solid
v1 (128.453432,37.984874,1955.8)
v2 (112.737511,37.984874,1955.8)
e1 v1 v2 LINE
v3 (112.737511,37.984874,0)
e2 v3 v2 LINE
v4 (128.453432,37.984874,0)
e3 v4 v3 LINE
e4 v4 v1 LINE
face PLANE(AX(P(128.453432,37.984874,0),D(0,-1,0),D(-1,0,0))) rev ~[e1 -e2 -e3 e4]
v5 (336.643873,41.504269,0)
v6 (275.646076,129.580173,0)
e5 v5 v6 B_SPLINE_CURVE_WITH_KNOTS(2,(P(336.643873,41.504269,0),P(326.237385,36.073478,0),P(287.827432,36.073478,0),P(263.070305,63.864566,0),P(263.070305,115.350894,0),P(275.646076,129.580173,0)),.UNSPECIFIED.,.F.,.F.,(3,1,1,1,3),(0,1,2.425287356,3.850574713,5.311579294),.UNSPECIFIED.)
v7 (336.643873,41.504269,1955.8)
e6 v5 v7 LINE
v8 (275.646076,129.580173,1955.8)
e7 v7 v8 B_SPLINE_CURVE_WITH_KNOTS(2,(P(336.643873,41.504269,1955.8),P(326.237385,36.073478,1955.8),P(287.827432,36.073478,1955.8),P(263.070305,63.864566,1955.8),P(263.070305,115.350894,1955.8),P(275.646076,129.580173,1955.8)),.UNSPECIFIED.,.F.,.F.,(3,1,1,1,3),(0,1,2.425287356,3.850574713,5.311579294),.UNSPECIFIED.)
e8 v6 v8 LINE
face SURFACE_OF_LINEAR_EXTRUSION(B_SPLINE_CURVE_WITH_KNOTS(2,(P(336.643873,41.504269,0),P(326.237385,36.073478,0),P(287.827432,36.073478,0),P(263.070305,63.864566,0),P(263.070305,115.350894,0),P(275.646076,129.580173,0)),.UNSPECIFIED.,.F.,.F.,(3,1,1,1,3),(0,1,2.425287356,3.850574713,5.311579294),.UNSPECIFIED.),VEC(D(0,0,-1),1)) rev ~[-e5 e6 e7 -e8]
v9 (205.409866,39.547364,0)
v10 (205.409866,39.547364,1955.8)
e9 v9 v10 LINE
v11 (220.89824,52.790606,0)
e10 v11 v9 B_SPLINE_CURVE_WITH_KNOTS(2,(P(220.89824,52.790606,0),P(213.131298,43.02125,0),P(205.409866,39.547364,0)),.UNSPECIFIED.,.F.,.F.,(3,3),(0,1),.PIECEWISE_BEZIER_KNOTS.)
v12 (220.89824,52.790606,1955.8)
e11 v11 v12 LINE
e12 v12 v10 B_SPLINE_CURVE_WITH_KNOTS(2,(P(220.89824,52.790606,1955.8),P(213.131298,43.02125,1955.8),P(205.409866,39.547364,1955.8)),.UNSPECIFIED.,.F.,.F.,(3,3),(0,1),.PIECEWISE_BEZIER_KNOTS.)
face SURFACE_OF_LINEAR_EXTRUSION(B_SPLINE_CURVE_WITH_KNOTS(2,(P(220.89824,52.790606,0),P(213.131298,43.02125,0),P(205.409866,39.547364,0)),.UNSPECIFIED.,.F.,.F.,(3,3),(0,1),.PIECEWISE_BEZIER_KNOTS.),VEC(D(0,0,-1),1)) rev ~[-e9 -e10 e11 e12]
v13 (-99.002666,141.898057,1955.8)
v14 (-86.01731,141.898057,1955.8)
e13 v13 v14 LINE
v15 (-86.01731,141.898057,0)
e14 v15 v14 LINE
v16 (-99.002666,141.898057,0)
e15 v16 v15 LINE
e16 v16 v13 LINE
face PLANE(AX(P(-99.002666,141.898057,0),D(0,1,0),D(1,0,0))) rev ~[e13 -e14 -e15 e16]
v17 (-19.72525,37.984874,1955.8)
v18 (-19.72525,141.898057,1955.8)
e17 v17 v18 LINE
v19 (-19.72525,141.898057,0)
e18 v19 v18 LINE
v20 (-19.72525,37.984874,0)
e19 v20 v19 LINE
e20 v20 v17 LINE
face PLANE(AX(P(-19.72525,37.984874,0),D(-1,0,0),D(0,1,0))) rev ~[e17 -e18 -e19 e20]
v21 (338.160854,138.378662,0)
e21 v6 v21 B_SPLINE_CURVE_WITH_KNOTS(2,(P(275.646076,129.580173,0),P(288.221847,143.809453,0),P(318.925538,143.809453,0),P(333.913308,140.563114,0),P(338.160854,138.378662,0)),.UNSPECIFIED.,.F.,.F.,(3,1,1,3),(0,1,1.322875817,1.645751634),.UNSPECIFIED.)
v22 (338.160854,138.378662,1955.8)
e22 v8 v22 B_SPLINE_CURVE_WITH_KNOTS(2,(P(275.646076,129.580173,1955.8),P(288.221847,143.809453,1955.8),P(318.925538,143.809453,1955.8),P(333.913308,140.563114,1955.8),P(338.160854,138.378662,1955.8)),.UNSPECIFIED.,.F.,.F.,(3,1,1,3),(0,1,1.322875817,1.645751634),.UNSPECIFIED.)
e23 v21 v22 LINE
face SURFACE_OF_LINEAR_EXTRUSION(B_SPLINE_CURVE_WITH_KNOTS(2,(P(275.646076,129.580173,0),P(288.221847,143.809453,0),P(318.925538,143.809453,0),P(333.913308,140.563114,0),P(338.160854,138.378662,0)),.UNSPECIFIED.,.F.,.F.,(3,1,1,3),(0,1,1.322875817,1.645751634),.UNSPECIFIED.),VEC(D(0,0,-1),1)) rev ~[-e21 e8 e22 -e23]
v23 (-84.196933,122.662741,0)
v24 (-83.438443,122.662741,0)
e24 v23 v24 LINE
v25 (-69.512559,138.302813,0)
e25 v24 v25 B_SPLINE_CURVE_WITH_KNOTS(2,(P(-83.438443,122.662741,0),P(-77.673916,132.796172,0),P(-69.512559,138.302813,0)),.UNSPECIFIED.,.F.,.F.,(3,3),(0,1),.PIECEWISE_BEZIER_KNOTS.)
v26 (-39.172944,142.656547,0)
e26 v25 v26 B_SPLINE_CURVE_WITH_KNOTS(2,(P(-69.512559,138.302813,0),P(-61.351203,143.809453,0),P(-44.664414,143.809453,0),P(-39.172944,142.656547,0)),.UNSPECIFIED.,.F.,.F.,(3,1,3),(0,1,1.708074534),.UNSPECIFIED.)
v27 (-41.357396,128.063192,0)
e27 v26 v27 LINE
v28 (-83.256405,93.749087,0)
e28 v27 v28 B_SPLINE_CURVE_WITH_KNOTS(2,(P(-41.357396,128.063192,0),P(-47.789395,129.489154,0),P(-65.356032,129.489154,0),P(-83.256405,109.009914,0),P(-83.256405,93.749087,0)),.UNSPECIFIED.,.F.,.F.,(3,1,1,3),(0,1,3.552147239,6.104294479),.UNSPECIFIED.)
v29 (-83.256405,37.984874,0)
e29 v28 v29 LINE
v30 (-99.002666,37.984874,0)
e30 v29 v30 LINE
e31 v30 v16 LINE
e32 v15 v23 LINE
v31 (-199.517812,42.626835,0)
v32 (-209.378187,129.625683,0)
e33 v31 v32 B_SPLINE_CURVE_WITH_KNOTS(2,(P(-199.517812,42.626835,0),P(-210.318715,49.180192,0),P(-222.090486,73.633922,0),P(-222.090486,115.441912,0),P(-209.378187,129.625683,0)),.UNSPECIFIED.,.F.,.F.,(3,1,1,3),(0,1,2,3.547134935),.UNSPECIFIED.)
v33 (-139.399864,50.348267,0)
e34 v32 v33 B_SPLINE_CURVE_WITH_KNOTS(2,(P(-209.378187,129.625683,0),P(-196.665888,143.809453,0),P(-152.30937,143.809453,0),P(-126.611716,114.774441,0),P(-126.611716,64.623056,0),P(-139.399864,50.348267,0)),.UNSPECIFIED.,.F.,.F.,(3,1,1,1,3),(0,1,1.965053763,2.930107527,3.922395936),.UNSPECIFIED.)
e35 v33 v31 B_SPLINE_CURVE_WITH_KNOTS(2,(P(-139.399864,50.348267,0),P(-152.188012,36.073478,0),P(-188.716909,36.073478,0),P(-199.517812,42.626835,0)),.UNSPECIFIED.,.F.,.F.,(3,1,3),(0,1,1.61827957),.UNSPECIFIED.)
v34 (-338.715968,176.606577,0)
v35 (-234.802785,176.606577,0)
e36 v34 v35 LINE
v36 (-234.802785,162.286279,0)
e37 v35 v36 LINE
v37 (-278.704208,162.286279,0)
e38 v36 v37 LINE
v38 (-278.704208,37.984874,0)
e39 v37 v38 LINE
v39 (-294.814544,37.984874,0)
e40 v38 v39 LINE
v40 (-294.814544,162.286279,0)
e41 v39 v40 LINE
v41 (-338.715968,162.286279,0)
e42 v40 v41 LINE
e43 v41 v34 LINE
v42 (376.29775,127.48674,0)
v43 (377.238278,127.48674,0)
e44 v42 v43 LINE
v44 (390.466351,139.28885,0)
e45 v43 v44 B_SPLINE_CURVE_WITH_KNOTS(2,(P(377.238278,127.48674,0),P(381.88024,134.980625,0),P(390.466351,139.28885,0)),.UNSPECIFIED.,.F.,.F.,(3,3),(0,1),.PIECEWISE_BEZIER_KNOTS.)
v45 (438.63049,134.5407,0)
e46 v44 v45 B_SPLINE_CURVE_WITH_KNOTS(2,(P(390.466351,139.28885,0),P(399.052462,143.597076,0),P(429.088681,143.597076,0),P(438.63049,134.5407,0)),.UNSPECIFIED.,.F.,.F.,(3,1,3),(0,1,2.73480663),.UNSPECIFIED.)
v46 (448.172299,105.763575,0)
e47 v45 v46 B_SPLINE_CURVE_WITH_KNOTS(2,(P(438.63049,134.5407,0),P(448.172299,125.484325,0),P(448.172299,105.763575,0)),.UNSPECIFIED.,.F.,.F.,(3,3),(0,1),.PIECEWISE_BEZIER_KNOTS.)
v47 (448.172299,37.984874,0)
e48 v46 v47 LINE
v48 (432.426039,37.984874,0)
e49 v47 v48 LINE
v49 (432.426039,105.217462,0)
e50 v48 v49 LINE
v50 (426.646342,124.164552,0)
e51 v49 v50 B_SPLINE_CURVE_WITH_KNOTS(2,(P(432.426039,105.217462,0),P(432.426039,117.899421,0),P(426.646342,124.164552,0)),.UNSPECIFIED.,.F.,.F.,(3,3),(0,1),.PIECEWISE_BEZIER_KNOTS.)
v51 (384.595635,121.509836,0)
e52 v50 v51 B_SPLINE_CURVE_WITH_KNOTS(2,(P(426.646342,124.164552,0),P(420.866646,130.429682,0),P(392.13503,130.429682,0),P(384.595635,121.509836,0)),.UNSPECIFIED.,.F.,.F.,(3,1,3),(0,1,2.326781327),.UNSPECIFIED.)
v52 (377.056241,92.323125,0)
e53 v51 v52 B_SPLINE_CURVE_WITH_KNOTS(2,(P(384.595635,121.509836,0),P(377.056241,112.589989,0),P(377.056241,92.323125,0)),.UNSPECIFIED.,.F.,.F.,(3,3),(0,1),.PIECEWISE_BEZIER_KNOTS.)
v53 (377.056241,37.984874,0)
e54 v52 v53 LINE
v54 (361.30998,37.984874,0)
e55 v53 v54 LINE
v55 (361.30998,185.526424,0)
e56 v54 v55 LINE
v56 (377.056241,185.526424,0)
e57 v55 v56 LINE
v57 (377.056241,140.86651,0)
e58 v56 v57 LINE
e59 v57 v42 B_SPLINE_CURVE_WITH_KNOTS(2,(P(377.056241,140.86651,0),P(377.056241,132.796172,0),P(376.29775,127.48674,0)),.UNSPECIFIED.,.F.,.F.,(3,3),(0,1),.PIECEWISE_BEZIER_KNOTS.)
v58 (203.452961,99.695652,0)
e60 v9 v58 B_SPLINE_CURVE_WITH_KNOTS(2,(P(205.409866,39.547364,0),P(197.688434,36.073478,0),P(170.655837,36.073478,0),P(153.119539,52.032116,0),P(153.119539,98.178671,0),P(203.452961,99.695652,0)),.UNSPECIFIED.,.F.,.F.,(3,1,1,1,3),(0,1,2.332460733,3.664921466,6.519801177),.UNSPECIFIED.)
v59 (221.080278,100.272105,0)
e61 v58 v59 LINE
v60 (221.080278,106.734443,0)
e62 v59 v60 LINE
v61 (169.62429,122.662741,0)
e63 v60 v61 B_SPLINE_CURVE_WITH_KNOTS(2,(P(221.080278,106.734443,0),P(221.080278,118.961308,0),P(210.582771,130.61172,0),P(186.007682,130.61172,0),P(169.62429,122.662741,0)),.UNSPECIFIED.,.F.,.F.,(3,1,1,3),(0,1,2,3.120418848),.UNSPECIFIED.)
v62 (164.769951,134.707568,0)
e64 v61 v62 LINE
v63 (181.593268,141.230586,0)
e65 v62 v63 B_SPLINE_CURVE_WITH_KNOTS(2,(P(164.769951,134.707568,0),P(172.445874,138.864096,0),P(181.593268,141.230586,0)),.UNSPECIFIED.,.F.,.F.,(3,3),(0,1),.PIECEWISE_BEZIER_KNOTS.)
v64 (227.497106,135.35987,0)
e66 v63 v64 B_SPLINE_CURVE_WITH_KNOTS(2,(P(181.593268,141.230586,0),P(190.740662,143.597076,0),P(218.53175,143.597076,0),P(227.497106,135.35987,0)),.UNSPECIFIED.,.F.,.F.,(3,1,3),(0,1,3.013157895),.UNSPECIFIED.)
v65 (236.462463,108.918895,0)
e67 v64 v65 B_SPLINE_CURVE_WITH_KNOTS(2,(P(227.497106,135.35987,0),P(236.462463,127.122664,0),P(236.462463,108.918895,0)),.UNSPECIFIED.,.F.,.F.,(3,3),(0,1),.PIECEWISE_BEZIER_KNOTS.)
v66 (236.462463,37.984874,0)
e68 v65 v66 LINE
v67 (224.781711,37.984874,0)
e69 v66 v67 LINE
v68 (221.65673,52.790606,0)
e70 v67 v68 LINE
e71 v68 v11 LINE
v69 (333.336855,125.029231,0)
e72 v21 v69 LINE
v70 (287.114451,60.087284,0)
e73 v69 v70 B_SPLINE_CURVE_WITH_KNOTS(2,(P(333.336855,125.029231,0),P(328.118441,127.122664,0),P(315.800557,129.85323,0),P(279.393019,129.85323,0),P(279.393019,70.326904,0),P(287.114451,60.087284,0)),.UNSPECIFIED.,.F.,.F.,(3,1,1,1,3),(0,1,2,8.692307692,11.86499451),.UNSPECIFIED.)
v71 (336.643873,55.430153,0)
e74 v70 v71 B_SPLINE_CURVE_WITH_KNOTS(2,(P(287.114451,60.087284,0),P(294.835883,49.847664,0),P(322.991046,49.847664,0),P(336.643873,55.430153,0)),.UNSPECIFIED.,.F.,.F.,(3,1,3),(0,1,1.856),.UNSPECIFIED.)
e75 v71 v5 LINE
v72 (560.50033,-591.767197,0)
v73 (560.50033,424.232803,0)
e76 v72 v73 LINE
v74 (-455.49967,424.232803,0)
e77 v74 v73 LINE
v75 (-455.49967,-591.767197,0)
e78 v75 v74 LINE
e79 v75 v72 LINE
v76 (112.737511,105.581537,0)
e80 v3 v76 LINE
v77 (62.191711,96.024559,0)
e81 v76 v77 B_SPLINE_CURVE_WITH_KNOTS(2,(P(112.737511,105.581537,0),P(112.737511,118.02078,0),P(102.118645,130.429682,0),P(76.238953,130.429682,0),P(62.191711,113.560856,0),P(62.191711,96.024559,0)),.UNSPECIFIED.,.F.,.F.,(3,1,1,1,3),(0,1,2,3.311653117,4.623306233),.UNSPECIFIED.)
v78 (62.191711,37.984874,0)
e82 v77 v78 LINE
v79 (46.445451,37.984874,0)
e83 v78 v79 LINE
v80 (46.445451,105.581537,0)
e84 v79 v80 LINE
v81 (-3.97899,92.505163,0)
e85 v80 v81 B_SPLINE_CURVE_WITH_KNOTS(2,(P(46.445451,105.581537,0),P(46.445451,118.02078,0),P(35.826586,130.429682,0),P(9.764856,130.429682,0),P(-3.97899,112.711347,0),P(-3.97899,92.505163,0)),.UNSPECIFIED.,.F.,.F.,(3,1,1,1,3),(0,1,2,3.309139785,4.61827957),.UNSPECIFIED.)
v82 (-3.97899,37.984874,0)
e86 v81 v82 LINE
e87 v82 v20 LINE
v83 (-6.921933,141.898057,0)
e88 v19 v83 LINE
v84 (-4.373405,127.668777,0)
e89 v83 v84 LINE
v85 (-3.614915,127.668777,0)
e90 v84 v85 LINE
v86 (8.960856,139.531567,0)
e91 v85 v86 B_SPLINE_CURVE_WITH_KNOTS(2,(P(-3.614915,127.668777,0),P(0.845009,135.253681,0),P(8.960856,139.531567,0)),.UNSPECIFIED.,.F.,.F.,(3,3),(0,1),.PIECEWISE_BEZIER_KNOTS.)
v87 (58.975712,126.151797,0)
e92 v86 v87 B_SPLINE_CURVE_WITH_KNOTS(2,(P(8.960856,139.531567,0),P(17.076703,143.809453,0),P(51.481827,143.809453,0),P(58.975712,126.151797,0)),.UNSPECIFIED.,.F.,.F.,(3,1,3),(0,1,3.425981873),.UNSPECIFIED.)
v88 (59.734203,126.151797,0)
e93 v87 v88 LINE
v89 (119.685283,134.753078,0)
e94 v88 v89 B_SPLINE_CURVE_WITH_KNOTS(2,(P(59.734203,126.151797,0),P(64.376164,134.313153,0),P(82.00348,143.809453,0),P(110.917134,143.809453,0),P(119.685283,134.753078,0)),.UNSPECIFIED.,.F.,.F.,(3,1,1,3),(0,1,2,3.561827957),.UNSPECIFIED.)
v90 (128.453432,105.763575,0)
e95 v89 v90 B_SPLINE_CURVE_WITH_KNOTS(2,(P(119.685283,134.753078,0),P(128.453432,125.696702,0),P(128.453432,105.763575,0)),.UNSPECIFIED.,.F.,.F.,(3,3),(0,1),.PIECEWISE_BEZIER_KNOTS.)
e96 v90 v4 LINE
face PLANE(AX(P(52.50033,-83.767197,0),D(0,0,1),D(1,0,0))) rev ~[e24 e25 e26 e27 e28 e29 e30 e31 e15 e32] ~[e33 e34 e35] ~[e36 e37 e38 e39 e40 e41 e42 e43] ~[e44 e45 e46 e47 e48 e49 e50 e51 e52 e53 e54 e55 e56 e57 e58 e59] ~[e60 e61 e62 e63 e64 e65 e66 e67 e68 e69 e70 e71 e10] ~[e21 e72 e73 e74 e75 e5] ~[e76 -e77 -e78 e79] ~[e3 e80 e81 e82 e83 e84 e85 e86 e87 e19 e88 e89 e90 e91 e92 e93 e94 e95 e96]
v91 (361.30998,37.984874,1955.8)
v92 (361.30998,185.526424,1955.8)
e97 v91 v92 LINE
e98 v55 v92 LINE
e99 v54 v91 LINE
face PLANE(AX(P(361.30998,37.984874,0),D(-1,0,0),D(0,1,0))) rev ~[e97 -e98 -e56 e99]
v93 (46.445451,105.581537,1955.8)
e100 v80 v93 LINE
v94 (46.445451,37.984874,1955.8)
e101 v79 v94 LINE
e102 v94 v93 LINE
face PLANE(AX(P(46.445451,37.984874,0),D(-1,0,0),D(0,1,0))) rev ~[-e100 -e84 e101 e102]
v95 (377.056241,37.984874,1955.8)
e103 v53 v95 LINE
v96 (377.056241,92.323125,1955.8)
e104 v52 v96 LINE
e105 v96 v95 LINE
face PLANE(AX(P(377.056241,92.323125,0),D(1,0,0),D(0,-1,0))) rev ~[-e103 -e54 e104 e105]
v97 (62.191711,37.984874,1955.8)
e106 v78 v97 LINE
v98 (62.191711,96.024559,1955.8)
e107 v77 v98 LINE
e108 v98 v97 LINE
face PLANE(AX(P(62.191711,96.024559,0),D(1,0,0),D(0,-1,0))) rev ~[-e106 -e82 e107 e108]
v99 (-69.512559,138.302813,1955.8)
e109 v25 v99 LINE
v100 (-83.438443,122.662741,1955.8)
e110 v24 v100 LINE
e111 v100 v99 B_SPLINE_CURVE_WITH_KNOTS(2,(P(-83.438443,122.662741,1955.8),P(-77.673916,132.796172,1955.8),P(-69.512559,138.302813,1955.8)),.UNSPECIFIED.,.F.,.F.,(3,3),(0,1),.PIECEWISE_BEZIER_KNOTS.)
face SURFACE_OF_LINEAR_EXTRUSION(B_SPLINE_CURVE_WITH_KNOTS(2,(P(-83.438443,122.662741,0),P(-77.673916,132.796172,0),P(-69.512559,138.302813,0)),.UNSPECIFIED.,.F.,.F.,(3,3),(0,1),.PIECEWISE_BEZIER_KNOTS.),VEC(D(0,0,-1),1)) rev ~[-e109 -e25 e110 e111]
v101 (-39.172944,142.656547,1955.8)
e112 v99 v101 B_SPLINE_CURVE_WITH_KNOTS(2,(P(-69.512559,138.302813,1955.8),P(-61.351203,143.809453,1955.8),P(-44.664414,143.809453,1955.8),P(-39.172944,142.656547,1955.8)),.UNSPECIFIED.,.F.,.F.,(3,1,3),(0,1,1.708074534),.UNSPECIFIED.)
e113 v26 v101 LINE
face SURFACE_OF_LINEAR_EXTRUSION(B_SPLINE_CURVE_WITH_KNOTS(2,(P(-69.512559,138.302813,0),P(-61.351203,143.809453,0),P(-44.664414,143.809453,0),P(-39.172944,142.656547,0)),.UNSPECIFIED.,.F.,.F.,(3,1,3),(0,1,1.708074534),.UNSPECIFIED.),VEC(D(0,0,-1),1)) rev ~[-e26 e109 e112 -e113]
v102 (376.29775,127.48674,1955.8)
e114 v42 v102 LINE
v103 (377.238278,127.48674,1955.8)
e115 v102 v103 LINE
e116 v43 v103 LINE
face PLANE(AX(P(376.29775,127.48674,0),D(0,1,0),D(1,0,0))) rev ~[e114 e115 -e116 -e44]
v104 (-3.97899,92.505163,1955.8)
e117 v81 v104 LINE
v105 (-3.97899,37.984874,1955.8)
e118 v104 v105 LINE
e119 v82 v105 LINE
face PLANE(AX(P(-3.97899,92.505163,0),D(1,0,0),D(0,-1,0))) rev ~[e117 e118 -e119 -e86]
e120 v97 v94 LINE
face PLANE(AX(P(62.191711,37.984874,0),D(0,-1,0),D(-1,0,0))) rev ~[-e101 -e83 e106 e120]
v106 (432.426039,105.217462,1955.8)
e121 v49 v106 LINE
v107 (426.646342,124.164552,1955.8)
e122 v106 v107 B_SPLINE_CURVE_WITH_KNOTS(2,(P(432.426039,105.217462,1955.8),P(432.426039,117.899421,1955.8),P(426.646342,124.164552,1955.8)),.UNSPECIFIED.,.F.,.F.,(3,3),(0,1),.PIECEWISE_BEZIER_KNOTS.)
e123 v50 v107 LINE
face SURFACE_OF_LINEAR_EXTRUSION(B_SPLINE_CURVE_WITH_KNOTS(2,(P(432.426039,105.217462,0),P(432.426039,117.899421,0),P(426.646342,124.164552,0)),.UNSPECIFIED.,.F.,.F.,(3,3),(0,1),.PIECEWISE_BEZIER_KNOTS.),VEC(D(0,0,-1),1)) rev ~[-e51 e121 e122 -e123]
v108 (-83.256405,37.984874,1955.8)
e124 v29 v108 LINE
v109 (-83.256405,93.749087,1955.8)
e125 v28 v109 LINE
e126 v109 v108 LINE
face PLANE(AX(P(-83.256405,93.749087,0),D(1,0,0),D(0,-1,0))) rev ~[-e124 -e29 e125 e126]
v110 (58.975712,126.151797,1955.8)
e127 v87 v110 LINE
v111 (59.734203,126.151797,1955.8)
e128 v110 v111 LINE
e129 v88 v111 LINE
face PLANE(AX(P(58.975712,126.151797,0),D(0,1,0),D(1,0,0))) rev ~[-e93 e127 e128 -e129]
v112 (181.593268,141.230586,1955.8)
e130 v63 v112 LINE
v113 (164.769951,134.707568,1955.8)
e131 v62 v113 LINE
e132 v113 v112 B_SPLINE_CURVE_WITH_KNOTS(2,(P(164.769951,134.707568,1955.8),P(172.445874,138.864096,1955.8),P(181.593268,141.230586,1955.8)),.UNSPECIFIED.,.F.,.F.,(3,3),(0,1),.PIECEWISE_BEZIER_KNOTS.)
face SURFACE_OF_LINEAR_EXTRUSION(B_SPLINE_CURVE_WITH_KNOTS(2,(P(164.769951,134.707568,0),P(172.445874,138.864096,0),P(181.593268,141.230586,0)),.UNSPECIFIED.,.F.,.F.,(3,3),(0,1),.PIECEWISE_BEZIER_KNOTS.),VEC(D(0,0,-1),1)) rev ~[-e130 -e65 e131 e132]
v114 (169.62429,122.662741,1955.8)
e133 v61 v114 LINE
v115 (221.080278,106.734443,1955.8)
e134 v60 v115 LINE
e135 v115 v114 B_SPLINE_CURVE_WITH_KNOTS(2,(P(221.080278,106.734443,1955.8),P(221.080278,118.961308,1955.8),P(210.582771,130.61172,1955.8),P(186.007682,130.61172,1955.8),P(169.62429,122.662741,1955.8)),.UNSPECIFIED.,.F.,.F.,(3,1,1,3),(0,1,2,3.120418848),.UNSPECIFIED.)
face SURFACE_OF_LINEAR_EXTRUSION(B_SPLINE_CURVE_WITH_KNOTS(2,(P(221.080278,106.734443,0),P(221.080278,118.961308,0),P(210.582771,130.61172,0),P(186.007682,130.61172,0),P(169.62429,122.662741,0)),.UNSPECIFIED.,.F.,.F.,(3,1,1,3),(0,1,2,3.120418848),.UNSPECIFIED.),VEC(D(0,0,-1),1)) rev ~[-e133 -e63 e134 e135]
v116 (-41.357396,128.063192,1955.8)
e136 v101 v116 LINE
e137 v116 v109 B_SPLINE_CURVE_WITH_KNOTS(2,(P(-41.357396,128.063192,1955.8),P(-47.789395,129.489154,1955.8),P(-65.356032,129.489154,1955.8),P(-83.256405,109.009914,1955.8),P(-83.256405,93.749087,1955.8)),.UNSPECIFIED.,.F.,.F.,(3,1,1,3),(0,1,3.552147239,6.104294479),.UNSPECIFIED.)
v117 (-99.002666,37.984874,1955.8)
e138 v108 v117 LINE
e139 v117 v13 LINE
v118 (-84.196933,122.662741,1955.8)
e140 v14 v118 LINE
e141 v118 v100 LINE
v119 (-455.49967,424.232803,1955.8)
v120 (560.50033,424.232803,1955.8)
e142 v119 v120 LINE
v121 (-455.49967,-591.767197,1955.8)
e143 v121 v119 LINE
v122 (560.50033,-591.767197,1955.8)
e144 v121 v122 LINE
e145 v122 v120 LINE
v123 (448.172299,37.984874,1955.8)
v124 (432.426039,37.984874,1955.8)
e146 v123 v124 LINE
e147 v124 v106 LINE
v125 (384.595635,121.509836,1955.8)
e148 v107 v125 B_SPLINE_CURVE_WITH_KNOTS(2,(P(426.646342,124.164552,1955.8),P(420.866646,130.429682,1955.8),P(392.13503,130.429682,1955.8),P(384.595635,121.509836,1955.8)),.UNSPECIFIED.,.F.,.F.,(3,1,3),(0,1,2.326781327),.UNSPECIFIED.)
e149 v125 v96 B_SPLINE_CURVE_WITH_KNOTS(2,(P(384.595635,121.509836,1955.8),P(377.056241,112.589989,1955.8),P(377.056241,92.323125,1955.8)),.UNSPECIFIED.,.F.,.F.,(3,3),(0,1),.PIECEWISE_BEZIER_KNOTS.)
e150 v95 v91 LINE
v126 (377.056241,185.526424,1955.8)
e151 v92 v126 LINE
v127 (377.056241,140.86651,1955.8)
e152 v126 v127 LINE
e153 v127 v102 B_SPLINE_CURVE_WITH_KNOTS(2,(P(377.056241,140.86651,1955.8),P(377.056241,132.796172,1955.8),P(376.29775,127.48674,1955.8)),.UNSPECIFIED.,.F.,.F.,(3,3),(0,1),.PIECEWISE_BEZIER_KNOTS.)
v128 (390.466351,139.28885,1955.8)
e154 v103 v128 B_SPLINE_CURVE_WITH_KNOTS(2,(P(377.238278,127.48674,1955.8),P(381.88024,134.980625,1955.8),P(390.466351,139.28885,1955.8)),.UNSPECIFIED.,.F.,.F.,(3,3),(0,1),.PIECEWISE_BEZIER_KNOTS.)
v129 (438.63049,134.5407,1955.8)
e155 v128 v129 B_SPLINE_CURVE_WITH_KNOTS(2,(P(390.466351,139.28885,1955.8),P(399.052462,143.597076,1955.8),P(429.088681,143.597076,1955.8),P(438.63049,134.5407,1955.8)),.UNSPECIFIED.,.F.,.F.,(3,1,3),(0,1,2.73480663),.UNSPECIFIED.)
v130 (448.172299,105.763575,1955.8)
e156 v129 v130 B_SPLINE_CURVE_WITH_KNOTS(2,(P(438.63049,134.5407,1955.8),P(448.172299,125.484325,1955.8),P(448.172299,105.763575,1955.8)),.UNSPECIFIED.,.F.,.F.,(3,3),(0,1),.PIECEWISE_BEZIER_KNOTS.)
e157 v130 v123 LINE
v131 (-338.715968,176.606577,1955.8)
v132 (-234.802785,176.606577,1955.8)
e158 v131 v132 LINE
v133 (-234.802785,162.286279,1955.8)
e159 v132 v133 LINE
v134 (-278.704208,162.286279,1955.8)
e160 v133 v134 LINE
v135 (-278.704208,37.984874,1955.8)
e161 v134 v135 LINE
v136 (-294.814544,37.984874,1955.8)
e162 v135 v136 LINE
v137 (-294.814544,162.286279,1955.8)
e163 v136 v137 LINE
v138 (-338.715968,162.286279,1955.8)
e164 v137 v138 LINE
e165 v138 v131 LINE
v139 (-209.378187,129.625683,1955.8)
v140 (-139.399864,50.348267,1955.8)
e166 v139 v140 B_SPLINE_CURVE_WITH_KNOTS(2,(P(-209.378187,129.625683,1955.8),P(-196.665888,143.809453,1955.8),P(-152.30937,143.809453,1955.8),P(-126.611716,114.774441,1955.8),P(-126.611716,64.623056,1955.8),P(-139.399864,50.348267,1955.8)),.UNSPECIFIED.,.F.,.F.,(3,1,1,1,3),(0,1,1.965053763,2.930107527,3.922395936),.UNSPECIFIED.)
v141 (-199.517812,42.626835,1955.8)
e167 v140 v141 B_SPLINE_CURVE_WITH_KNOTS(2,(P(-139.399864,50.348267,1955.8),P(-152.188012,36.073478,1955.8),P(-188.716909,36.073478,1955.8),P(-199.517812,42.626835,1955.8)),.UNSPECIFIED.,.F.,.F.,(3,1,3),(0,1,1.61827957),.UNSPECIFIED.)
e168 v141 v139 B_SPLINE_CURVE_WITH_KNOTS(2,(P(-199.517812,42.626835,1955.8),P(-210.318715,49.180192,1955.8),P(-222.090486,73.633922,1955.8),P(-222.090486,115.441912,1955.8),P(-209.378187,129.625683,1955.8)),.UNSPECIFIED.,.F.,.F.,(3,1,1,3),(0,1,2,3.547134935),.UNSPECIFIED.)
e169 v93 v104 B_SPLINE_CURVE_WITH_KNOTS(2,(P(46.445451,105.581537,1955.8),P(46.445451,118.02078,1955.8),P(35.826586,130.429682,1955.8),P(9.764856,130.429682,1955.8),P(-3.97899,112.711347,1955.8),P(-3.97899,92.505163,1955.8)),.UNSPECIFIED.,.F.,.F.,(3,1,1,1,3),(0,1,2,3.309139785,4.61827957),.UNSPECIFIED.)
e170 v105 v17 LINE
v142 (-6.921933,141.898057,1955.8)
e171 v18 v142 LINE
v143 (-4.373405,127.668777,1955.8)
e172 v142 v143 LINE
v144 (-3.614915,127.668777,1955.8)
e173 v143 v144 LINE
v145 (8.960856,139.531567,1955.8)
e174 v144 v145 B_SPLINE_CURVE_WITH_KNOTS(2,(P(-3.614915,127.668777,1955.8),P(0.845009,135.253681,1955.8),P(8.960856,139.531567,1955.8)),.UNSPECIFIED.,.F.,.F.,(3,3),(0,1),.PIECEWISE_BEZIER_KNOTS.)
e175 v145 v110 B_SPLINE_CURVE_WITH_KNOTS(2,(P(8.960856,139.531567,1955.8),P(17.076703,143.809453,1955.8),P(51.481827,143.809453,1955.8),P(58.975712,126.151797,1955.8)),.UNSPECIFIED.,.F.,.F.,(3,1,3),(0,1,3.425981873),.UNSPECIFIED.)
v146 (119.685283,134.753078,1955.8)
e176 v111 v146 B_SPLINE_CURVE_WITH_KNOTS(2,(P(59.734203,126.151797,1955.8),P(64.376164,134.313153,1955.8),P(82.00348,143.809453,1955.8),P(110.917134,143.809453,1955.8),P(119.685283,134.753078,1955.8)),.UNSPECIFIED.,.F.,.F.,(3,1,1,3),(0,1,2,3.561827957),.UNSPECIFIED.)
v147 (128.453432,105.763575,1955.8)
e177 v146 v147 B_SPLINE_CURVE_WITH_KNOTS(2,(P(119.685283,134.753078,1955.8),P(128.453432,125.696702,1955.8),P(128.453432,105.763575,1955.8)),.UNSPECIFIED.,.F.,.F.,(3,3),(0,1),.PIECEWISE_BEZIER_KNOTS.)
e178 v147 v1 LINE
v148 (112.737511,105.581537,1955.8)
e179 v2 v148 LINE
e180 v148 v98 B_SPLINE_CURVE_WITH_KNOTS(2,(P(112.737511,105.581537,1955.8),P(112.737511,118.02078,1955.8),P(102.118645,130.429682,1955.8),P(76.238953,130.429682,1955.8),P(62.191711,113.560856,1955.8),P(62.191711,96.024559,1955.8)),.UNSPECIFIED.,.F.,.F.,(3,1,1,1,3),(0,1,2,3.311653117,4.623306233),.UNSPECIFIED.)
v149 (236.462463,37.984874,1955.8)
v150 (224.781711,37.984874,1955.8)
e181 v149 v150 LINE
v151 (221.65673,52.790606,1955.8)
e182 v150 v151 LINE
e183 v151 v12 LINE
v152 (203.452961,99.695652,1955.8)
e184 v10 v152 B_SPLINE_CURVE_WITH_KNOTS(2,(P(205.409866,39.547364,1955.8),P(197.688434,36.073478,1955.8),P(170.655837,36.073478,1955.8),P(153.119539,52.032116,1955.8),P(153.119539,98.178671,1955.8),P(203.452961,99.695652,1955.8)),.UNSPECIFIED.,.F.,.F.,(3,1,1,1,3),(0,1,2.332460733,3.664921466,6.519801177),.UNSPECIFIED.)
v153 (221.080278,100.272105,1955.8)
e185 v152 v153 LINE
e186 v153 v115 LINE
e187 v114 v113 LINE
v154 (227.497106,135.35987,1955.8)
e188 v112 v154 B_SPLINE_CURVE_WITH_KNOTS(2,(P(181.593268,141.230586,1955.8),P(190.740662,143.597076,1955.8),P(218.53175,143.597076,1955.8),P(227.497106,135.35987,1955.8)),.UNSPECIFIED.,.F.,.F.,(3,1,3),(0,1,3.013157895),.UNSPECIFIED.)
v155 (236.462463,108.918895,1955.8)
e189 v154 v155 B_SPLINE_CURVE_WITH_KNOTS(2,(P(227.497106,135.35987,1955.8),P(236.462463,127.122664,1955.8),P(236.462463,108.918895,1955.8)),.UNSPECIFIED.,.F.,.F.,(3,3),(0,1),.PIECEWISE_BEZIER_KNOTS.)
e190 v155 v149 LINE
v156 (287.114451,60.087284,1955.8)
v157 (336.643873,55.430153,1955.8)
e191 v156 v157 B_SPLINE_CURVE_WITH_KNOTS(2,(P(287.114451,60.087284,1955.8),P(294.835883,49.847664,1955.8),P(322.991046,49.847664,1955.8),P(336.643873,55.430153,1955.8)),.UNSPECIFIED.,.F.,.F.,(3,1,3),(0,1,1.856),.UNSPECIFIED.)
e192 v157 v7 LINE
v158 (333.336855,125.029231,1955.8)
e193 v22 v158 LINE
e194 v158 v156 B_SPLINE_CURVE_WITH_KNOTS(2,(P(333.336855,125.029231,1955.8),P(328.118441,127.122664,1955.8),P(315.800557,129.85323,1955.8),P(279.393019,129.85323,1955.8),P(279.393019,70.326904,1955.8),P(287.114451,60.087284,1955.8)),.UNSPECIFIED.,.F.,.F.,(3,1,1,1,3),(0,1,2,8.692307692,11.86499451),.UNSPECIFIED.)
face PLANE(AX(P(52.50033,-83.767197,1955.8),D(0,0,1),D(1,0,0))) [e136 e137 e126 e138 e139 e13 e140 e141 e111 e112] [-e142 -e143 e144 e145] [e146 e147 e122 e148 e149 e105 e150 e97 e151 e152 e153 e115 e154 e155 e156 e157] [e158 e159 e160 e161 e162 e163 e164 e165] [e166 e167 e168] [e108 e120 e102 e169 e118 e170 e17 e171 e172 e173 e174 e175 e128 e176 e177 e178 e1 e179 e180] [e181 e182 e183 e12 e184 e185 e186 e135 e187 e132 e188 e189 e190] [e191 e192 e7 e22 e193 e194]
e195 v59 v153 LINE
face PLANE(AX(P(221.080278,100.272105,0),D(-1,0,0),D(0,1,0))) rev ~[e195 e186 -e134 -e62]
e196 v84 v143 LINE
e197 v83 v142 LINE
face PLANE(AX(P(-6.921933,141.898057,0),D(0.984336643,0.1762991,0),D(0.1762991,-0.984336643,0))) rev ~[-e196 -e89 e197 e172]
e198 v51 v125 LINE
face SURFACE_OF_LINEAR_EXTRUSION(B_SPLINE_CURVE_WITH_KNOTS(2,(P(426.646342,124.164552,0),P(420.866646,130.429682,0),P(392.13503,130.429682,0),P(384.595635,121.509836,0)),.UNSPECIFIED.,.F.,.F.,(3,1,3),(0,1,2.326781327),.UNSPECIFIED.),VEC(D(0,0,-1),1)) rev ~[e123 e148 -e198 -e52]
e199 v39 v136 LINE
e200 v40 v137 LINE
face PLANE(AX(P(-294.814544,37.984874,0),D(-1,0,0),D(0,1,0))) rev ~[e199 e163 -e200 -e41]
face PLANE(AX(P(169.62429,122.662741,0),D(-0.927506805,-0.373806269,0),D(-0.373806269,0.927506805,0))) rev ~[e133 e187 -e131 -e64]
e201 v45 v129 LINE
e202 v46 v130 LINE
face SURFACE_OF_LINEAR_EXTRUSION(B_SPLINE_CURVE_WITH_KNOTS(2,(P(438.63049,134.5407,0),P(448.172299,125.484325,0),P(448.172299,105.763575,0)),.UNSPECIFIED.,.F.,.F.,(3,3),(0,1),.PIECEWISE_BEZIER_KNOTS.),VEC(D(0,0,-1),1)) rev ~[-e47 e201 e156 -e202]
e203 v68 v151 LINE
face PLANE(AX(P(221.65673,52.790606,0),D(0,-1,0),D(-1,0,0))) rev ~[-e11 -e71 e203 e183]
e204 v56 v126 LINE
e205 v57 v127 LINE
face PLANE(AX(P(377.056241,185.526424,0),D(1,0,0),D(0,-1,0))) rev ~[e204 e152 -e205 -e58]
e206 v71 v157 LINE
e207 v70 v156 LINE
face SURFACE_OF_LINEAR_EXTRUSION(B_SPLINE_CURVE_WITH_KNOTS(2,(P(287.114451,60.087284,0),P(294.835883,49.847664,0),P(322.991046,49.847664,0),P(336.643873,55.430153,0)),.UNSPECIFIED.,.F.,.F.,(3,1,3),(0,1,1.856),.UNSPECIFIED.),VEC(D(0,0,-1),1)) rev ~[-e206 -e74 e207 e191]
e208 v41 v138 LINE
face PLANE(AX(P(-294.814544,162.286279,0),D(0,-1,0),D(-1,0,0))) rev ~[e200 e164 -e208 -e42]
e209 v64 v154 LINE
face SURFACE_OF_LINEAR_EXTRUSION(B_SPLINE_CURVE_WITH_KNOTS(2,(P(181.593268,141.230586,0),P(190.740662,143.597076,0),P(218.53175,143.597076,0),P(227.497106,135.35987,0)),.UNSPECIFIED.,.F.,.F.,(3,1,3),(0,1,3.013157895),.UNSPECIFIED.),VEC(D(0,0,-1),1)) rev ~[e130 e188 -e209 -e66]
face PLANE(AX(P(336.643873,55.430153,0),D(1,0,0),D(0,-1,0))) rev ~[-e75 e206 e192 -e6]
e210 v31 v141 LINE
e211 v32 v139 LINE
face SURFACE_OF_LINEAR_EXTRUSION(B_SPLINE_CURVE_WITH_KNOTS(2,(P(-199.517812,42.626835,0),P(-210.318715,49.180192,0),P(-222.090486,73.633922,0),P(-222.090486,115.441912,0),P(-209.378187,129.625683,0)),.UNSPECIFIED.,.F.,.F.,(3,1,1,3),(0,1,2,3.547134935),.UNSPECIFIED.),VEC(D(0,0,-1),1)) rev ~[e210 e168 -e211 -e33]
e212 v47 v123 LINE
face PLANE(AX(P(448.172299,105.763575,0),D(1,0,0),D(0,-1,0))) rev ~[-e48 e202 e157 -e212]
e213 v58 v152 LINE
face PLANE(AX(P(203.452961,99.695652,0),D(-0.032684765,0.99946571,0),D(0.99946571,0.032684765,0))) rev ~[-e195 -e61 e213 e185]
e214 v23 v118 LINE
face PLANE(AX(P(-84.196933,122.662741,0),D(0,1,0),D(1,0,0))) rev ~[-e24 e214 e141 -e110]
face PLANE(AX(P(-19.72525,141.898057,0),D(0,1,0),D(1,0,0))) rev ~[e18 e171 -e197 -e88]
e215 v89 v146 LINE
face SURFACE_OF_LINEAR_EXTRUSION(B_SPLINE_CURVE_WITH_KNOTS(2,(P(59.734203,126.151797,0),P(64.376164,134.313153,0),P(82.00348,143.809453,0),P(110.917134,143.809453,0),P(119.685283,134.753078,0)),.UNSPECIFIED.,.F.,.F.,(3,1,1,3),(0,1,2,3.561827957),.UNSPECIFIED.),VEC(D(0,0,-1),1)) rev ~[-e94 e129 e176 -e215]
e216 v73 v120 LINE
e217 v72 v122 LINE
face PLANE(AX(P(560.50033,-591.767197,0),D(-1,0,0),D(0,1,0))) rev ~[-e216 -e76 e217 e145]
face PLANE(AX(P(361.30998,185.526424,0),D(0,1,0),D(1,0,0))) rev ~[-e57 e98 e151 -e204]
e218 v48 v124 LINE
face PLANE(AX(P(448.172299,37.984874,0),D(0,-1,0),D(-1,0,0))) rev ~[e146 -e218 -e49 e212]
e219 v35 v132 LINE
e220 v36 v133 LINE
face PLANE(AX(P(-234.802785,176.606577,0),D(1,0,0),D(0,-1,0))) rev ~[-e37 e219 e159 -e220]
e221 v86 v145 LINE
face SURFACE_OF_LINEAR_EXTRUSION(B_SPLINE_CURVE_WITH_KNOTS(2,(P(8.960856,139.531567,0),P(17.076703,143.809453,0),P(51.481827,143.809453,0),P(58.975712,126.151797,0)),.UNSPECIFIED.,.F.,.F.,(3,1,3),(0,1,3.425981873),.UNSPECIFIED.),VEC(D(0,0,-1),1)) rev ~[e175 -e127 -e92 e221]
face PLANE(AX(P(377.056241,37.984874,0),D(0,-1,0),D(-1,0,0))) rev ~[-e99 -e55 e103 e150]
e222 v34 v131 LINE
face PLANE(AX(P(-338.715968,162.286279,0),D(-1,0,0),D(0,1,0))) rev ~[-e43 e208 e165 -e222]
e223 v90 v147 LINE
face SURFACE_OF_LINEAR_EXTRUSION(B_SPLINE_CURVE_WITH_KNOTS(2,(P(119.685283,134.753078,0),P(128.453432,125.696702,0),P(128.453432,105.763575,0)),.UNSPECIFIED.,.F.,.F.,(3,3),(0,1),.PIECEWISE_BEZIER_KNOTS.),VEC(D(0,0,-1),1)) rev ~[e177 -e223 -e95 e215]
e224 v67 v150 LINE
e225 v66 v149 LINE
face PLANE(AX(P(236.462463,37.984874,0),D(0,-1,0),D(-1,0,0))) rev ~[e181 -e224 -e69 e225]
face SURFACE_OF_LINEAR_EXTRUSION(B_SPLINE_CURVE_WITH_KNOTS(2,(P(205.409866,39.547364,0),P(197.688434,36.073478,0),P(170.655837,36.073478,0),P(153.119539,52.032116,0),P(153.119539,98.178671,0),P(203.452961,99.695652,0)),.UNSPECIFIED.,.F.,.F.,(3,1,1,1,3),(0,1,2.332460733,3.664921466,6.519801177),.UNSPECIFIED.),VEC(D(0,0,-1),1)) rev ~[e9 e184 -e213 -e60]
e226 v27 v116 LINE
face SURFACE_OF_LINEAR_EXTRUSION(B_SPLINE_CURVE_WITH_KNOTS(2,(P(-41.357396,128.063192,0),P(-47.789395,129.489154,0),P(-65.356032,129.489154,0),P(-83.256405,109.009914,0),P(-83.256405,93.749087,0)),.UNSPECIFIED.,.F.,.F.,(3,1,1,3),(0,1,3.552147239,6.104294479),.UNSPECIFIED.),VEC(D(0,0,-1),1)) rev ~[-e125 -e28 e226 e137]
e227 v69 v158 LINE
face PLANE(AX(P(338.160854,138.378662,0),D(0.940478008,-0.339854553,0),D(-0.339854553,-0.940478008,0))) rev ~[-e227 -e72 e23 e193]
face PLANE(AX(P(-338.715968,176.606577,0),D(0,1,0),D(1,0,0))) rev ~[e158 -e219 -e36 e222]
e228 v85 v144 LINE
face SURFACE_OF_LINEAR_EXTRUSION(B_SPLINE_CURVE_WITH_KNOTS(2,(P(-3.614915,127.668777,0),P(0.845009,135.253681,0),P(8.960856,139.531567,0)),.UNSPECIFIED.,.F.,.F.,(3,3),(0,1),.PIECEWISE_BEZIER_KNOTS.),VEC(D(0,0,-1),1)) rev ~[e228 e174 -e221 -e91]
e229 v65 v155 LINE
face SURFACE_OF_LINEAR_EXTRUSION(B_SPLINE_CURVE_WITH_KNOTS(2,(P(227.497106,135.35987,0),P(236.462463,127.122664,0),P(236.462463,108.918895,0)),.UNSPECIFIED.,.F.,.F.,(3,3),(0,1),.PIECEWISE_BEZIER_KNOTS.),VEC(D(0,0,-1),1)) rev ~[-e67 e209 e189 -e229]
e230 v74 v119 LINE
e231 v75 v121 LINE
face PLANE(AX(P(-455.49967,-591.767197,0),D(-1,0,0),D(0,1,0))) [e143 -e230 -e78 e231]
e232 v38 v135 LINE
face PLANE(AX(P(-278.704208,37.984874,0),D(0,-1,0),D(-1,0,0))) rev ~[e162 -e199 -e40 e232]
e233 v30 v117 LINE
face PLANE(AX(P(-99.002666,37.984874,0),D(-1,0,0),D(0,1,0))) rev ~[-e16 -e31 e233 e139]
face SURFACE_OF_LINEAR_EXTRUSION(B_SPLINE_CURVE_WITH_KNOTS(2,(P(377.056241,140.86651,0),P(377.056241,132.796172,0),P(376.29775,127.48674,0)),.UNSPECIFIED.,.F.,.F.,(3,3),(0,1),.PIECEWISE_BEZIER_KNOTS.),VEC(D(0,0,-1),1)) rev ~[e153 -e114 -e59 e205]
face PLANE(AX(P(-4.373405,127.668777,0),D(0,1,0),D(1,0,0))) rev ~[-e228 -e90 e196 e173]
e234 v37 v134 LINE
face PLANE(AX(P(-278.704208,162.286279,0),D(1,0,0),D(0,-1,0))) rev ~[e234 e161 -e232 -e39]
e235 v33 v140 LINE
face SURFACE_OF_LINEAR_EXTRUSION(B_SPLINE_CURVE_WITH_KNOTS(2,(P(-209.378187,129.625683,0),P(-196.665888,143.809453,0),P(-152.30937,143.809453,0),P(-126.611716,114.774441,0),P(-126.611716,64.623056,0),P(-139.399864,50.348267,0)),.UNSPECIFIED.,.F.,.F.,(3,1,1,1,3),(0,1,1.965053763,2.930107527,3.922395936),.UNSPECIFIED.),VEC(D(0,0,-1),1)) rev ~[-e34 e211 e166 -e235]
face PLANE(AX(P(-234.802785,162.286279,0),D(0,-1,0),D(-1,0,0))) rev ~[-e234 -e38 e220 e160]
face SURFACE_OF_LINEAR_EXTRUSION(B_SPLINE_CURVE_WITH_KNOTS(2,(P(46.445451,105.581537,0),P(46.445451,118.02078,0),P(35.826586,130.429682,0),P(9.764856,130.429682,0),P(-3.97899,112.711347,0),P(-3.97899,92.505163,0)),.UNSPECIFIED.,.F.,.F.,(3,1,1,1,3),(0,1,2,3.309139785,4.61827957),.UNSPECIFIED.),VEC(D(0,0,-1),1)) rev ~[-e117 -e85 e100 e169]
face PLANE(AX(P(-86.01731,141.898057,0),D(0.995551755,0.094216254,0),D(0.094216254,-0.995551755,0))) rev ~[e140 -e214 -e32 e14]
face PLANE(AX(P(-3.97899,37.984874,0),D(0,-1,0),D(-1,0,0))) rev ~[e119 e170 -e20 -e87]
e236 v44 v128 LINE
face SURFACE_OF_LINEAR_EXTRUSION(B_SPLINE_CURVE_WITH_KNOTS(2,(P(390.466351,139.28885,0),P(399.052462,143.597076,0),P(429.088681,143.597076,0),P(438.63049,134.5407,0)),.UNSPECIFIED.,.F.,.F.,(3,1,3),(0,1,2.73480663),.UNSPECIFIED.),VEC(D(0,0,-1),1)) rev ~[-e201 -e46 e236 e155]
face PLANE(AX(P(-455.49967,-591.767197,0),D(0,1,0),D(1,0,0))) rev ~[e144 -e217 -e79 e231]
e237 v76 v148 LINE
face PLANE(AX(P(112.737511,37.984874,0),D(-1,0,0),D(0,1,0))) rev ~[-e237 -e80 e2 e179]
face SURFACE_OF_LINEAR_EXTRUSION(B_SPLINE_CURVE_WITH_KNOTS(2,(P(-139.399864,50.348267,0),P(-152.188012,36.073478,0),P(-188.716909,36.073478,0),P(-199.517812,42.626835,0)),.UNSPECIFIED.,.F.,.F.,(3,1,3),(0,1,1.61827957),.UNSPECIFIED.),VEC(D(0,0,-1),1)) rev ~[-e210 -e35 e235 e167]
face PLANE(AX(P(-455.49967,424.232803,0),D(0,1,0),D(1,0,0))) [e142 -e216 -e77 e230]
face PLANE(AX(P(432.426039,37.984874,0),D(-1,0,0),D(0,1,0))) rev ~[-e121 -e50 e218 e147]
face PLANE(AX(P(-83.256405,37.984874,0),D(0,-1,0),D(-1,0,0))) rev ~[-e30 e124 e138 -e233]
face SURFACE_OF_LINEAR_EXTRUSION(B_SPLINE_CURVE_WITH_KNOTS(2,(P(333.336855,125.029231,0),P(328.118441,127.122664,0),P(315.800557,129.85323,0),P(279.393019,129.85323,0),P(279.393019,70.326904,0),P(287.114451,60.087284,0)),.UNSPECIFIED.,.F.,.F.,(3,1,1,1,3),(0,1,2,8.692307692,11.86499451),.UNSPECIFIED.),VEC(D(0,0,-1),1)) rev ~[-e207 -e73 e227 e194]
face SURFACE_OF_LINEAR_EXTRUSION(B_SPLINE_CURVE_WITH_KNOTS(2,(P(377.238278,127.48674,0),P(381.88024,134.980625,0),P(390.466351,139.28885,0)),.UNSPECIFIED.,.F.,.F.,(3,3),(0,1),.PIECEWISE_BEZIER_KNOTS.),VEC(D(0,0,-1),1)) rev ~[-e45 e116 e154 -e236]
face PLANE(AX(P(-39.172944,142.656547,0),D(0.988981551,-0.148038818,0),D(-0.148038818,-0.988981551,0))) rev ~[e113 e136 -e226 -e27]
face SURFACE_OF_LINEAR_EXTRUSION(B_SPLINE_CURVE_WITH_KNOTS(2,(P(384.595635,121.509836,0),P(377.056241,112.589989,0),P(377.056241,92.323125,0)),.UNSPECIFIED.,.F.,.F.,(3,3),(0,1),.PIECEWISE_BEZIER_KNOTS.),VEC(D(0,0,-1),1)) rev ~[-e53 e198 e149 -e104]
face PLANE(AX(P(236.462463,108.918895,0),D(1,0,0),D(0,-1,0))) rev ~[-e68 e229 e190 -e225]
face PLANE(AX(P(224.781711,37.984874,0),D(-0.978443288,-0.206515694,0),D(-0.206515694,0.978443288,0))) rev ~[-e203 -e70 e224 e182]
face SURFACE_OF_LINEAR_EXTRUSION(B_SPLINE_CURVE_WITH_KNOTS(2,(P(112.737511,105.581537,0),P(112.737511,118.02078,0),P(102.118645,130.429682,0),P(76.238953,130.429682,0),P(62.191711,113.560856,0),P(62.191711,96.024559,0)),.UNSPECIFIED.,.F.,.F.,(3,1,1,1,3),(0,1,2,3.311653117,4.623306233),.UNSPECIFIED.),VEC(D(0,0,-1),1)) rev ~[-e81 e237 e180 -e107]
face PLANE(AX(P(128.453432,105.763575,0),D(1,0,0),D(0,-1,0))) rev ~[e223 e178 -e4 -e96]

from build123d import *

# Parameters (mm, degrees)
F0_W     = 1016
F0_H     = 1016
F1_DEPTH = 1955.8


with BuildPart() as f1:
    # F0 (on Top) → F1 (new body)
    with BuildSketch(Plane.XY):
        with Locations((52.5003295943, -83.767197299)):
            Rectangle(F0_W, F0_H)
        Polygon((-278.7042081327, 162.2862787117), (-278.7042081327, 37.9848740995), (-294.8145439514, 37.9848740995), (-294.8145439514, 162.2862787117), (-338.7159675476, 162.2862787117), (-338.7159675476, 176.6065772172), (-234.8027845364, 176.6065772172), (-234.8027845364, 162.2862787117), align=None, mode=Mode.SUBTRACT)
        with BuildLine():
            add(Edge.make_bspline(
                [(-139.4605428977, 129.2919468797), (-126.6117157429, 114.7744408736), (-126.6117157429, 90.0476542593)],
                knots=[0, 0, 0, 1, 1, 1], degree=2))
            add(Edge.make_bspline(
                [(-126.6117157429, 90.0476542593), (-126.6117157429, 64.6230564889), (-139.3998636668, 50.3482674067)],
                knots=[0, 0, 0, 1, 1, 1], degree=2))
            add(Edge.make_bspline(
                [(-139.3998636668, 50.3482674067), (-152.1880115906, 36.0734783244), (-174.760685506, 36.0734783244)],
                knots=[0, 0, 0, 1, 1, 1], degree=2))
            add(Edge.make_bspline(
                [(-174.760685506, 36.0734783244), (-188.7169086258, 36.0734783244), (-199.5178117359, 42.6268352676)],
                knots=[0, 0, 0, 1, 1, 1], degree=2))
            add(Edge.make_bspline(
                [(-199.5178117359, 42.6268352676), (-210.3187148459, 49.1801922108), (-216.2046002486, 61.4070572483)],
                knots=[0, 0, 0, 1, 1, 1], degree=2))
            add(Edge.make_bspline(
                [(-216.2046002486, 61.4070572483), (-222.0904856513, 73.6339222858), (-222.0904856513, 90.0476542593)],
                knots=[0, 0, 0, 1, 1, 1], degree=2))
            add(Edge.make_bspline(
                [(-222.0904856513, 90.0476542593), (-222.0904856513, 115.4419124141), (-209.3781867661, 129.6256826499)],
                knots=[0, 0, 0, 1, 1, 1], degree=2))
            add(Edge.make_bspline(
                [(-209.3781867661, 129.6256826499), (-196.665887881, 143.8094528858), (-174.0932139655, 143.8094528858)],
                knots=[0, 0, 0, 1, 1, 1], degree=2))
            add(Edge.make_bspline(
                [(-174.0932139655, 143.8094528858), (-152.3093700525, 143.8094528858), (-139.4605428977, 129.2919468797)],
                knots=[0, 0, 0, 1, 1, 1], degree=2))
        make_face(mode=Mode.SUBTRACT)
        with BuildLine():
            add(Edge.make_bspline(
                [(-69.5125594139, 138.3028126766), (-61.3512028503, 143.8094528858), (-51.5818466665, 143.8094528858)],
                knots=[0, 0, 0, 1, 1, 1], degree=2))
            add(Edge.make_bspline(
                [(-51.5818466665, 143.8094528858), (-44.6644143376, 143.8094528858), (-39.1729439361, 142.6565474976)],
                knots=[0, 0, 0, 1, 1, 1], degree=2))
            Line((-39.1729439361, 142.6565474976), (-41.3573962505, 128.0631924528))
            add(Edge.make_bspline(
                [(-41.3573962505, 128.0631924528), (-47.7893947318, 129.4891543803), (-52.7347520547, 129.4891543803)],
                knots=[0, 0, 0, 1, 1, 1], degree=2))
            add(Edge.make_bspline(
                [(-52.7347520547, 129.4891543803), (-65.3560320934, 129.4891543803), (-74.3062186593, 119.2495341566)],
                knots=[0, 0, 0, 1, 1, 1], degree=2))
            add(Edge.make_bspline(
                [(-74.3062186593, 119.2495341566), (-83.2564052253, 109.0099139328), (-83.2564052253, 93.7490873475)],
                knots=[0, 0, 0, 1, 1, 1], degree=2))
            Line((-83.2564052253, 93.7490873475), (-83.2564052253, 37.9848740995))
            Line((-83.2564052253, 37.9848740995), (-99.0026656582, 37.9848740995))
            Line((-99.0026656582, 37.9848740995), (-99.0026656582, 141.8980571107))
            Line((-99.0026656582, 141.8980571107), (-86.0173102337, 141.8980571107))
            Line((-86.0173102337, 141.8980571107), (-84.1969333051, 122.6627408978))
            Line((-84.1969333051, 122.6627408978), (-83.4384429181, 122.6627408978))
            add(Edge.make_bspline(
                [(-83.4384429181, 122.6627408978), (-77.6739159774, 132.7961724674), (-69.5125594139, 138.3028126766)],
                knots=[0, 0, 0, 1, 1, 1], degree=2))
        make_face(mode=Mode.SUBTRACT)
        with BuildLine():
            Line((128.4534315782, 37.9848740995), (112.7375107608, 37.9848740995))
            Line((112.7375107608, 37.9848740995), (112.7375107608, 105.5815373838))
            add(Edge.make_bspline(
                [(112.7375107608, 105.5815373838), (112.7375107608, 118.0207797297), (107.4280780522, 124.2252310949)],
                knots=[0, 0, 0, 1, 1, 1], degree=2))
            add(Edge.make_bspline(
                [(107.4280780522, 124.2252310949), (102.1186453436, 130.4296824601), (90.9233272323, 130.4296824601)],
                knots=[0, 0, 0, 1, 1, 1], degree=2))
            add(Edge.make_bspline(
                [(90.9233272323, 130.4296824601), (76.2389533411, 130.4296824601), (69.215332358, 121.9952693573)],
                knots=[0, 0, 0, 1, 1, 1], degree=2))
            add(Edge.make_bspline(
                [(69.215332358, 121.9952693573), (62.1917113749, 113.5608562545), (62.1917113749, 96.0245585084)],
                knots=[0, 0, 0, 1, 1, 1], degree=2))
            Line((62.1917113749, 96.0245585084), (62.1917113749, 37.9848740995))
            Line((62.1917113749, 37.9848740995), (46.445450942, 37.9848740995))
            Line((46.445450942, 37.9848740995), (46.445450942, 105.5815373838))
            add(Edge.make_bspline(
                [(46.445450942, 105.5815373838), (46.445450942, 118.0207797297), (41.1360182334, 124.2252310949)],
                knots=[0, 0, 0, 1, 1, 1], degree=2))
            add(Edge.make_bspline(
                [(41.1360182334, 124.2252310949), (35.8265855248, 130.4296824601), (24.5402485671, 130.4296824601)],
                knots=[0, 0, 0, 1, 1, 1], degree=2))
            add(Edge.make_bspline(
                [(24.5402485671, 130.4296824601), (9.7648558294, 130.4296824601), (2.8929329237, 121.5705147406)],
                knots=[0, 0, 0, 1, 1, 1], degree=2))
            add(Edge.make_bspline(
                [(2.8929329237, 121.5705147406), (-3.978989982, 112.7113470211), (-3.978989982, 92.5051631129)],
                knots=[0, 0, 0, 1, 1, 1], degree=2))
            Line((-3.978989982, 92.5051631129), (-3.978989982, 37.9848740995))
            Line((-3.978989982, 37.9848740995), (-19.7252504149, 37.9848740995))
            Line((-19.7252504149, 37.9848740995), (-19.7252504149, 141.8980571107))
            Line((-19.7252504149, 141.8980571107), (-6.9219326833, 141.8980571107))
            Line((-6.9219326833, 141.8980571107), (-4.3734049832, 127.6687774516))
            Line((-4.3734049832, 127.6687774516), (-3.6149145963, 127.6687774516))
            add(Edge.make_bspline(
                [(-3.6149145963, 127.6687774516), (0.845008879, 135.253681321), (8.9608560193, 139.5315671034)],
                knots=[0, 0, 0, 1, 1, 1], degree=2))
            add(Edge.make_bspline(
                [(8.9608560193, 139.5315671034), (17.0767031595, 143.8094528858), (27.1191158827, 143.8094528858)],
                knots=[0, 0, 0, 1, 1, 1], degree=2))
            add(Edge.make_bspline(
                [(27.1191158827, 143.8094528858), (51.4818271113, 143.8094528858), (58.9757121343, 126.1517966777)],
                knots=[0, 0, 0, 1, 1, 1], degree=2))
            Line((58.9757121343, 126.1517966777), (59.7342025212, 126.1517966777))
            add(Edge.make_bspline(
                [(59.7342025212, 126.1517966777), (64.3761636893, 134.3131532412), (73.1898219856, 139.0613030635)],
                knots=[0, 0, 0, 1, 1, 1], degree=2))
            add(Edge.make_bspline(
                [(73.1898219856, 139.0613030635), (82.0034802819, 143.8094528858), (93.2898172396, 143.8094528858)],
                knots=[0, 0, 0, 1, 1, 1], degree=2))
            add(Edge.make_bspline(
                [(93.2898172396, 143.8094528858), (110.9171338321, 143.8094528858), (119.6852827052, 134.7530776657)],
                knots=[0, 0, 0, 1, 1, 1], degree=2))
            add(Edge.make_bspline(
                [(119.6852827052, 134.7530776657), (128.4534315782, 125.6967024456), (128.4534315782, 105.7635750767)],
                knots=[0, 0, 0, 1, 1, 1], degree=2))
            Line((128.4534315782, 105.7635750767), (128.4534315782, 37.9848740995))
        make_face(mode=Mode.SUBTRACT)
        with BuildLine():
            Line((236.4624626789, 37.9848740995), (224.78171072, 37.9848740995))
            Line((224.78171072, 37.9848740995), (221.6567303258, 52.7906064526))
            Line((221.6567303258, 52.7906064526), (220.8982399388, 52.7906064526))
            add(Edge.make_bspline(
                [(220.8982399388, 52.7906064526), (213.1312983765, 43.0212502688), (205.4098662375, 39.5473642966)],
                knots=[0, 0, 0, 1, 1, 1], degree=2))
            add(Edge.make_bspline(
                [(205.4098662375, 39.5473642966), (197.6884340984, 36.0734783244), (186.0987009859, 36.0734783244)],
                knots=[0, 0, 0, 1, 1, 1], degree=2))
            add(Edge.make_bspline(
                [(186.0987009859, 36.0734783244), (170.6558367077, 36.0734783244), (161.8876878347, 44.052797195)],
                knots=[0, 0, 0, 1, 1, 1], degree=2))
            add(Edge.make_bspline(
                [(161.8876878347, 44.052797195), (153.1195389616, 52.0321160657), (153.1195389616, 66.7164899569)],
                knots=[0, 0, 0, 1, 1, 1], degree=2))
            add(Edge.make_bspline(
                [(153.1195389616, 66.7164899569), (153.1195389616, 98.1786712073), (203.4529610391, 99.6956519812)],
                knots=[0, 0, 0, 1, 1, 1], degree=2))
            Line((203.4529610391, 99.6956519812), (221.0802776317, 100.2721046752))
            Line((221.0802776317, 100.2721046752), (221.0802776317, 106.734442772))
            add(Edge.make_bspline(
                [(221.0802776317, 106.734442772), (221.0802776317, 118.9613078095), (215.8315241541, 124.7865139812)],
                knots=[0, 0, 0, 1, 1, 1], degree=2))
            add(Edge.make_bspline(
                [(215.8315241541, 124.7865139812), (210.5827706764, 130.611720153), (198.9930375639, 130.611720153)],
                knots=[0, 0, 0, 1, 1, 1], degree=2))
            add(Edge.make_bspline(
                [(198.9930375639, 130.611720153), (186.0076821395, 130.611720153), (169.6242897815, 122.6627408978)],
                knots=[0, 0, 0, 1, 1, 1], degree=2))
            Line((169.6242897815, 122.6627408978), (164.7699513051, 134.7075682424))
            add(Edge.make_bspline(
                [(164.7699513051, 134.7075682424), (172.4458740209, 138.8640955629), (181.5932680875, 141.2305855702)],
                knots=[0, 0, 0, 1, 1, 1], degree=2))
            add(Edge.make_bspline(
                [(181.5932680875, 141.2305855702), (190.740662154, 143.5970755774), (199.9639052592, 143.5970755774)],
                knots=[0, 0, 0, 1, 1, 1], degree=2))
            add(Edge.make_bspline(
                [(199.9639052592, 143.5970755774), (218.5317499316, 143.5970755774), (227.4971063052, 135.3598699752)],
                knots=[0, 0, 0, 1, 1, 1], degree=2))
            add(Edge.make_bspline(
                [(227.4971063052, 135.3598699752), (236.4624626789, 127.122664373), (236.4624626789, 108.9188950864)],
                knots=[0, 0, 0, 1, 1, 1], degree=2))
            Line((236.4624626789, 108.9188950864), (236.4624626789, 37.9848740995))
        make_face(mode=Mode.SUBTRACT)
        with BuildLine():
            add(Edge.make_bspline(
                [(336.6438729863, 41.5042694949), (326.2373848775, 36.0734783244), (310.4001055981, 36.0734783244)],
                knots=[0, 0, 0, 1, 1, 1], degree=2))
            add(Edge.make_bspline(
                [(310.4001055981, 36.0734783244), (287.8274316827, 36.0734783244), (275.4488685678, 49.9690222132)],
                knots=[0, 0, 0, 1, 1, 1], degree=2))
            add(Edge.make_bspline(
                [(275.4488685678, 49.9690222132), (263.0703054529, 63.864566102), (263.0703054529, 89.2891638723)],
                knots=[0, 0, 0, 1, 1, 1], degree=2))
            add(Edge.make_bspline(
                [(263.0703054529, 89.2891638723), (263.0703054529, 115.3508935677), (275.6460760684, 129.5801732267)],
                knots=[0, 0, 0, 1, 1, 1], degree=2))
            add(Edge.make_bspline(
                [(275.6460760684, 129.5801732267), (288.2218466839, 143.8094528858), (311.4316525243, 143.8094528858)],
                knots=[0, 0, 0, 1, 1, 1], degree=2))
            add(Edge.make_bspline(
                [(311.4316525243, 143.8094528858), (318.9255375473, 143.8094528858), (326.4194225703, 142.1862834577)],
                knots=[0, 0, 0, 1, 1, 1], degree=2))
            add(Edge.make_bspline(
                [(326.4194225703, 142.1862834577), (333.9133075933, 140.5631140296), (338.1608537602, 138.3786617153)],
                knots=[0, 0, 0, 1, 1, 1], degree=2))
            Line((338.1608537602, 138.3786617153), (333.3368548992, 125.0292309051))
            add(Edge.make_bspline(
                [(333.3368548992, 125.0292309051), (328.1184410371, 127.122664373), (321.9594990951, 128.4879470695)],
                knots=[0, 0, 0, 1, 1, 1], degree=2))
            add(Edge.make_bspline(
                [(321.9594990951, 128.4879470695), (315.8005571531, 129.853229766), (311.0675771386, 129.853229766)],
                knots=[0, 0, 0, 1, 1, 1], degree=2))
            add(Edge.make_bspline(
                [(311.0675771386, 129.853229766), (279.3930185799, 129.853229766), (279.3930185799, 89.4712015652)],
                knots=[0, 0, 0, 1, 1, 1], degree=2))
            add(Edge.make_bspline(
                [(279.3930185799, 89.4712015652), (279.3930185799, 70.3269041987), (287.1144507189, 60.087283975)],
                knots=[0, 0, 0, 1, 1, 1], degree=2))
            add(Edge.make_bspline(
                [(287.1144507189, 60.087283975), (294.835882858, 49.8476637513), (310.0056905969, 49.8476637513)],
                knots=[0, 0, 0, 1, 1, 1], degree=2))
            add(Edge.make_bspline(
                [(310.0056905969, 49.8476637513), (322.9910460213, 49.8476637513), (336.6438729863, 55.4301529992)],
                knots=[0, 0, 0, 1, 1, 1], degree=2))
            Line((336.6438729863, 55.4301529992), (336.6438729863, 41.5042694949))
        make_face(mode=Mode.SUBTRACT)
        with BuildLine():
            Line((448.1722994824, 37.9848740995), (432.4260390495, 37.9848740995))
            Line((432.4260390495, 37.9848740995), (432.4260390495, 105.2174619981))
            add(Edge.make_bspline(
                [(432.4260390495, 105.2174619981), (432.4260390495, 117.8994212678), (426.646342301, 124.1645518639)],
                knots=[0, 0, 0, 1, 1, 1], degree=2))
            add(Edge.make_bspline(
                [(426.646342301, 124.1645518639), (420.8666455525, 130.4296824601), (408.518422053, 130.4296824601)],
                knots=[0, 0, 0, 1, 1, 1], degree=2))
            add(Edge.make_bspline(
                [(408.518422053, 130.4296824601), (392.1350296951, 130.4296824601), (384.5956352488, 121.5098355096)],
                knots=[0, 0, 0, 1, 1, 1], degree=2))
            add(Edge.make_bspline(
                [(384.5956352488, 121.5098355096), (377.0562408026, 112.5899885592), (377.0562408026, 92.3231254201)],
                knots=[0, 0, 0, 1, 1, 1], degree=2))
            Line((377.0562408026, 92.3231254201), (377.0562408026, 37.9848740995))
            Line((377.0562408026, 37.9848740995), (361.3099803697, 37.9848740995))
            Line((361.3099803697, 37.9848740995), (361.3099803697, 185.5264241676))
            Line((361.3099803697, 185.5264241676), (377.0562408026, 185.5264241676))
            Line((377.0562408026, 185.5264241676), (377.0562408026, 140.8665101844))
            add(Edge.make_bspline(
                [(377.0562408026, 140.8665101844), (377.0562408026, 132.7961724674), (376.2977504157, 127.4867397588)],
                knots=[0, 0, 0, 1, 1, 1], degree=2))
            Line((376.2977504157, 127.4867397588), (377.2382784955, 127.4867397588))
            add(Edge.make_bspline(
                [(377.2382784955, 127.4867397588), (381.8802396636, 134.9806247817), (390.4663508438, 139.2888501796)],
                knots=[0, 0, 0, 1, 1, 1], degree=2))
            add(Edge.make_bspline(
                [(390.4663508438, 139.2888501796), (399.052462024, 143.5970755774), (410.0354028269, 143.5970755774)],
                knots=[0, 0, 0, 1, 1, 1], degree=2))
            add(Edge.make_bspline(
                [(410.0354028269, 143.5970755774), (429.0886813469, 143.5970755774), (438.6304904147, 134.5407003573)],
                knots=[0, 0, 0, 1, 1, 1], degree=2))
            add(Edge.make_bspline(
                [(438.6304904147, 134.5407003573), (448.1722994824, 125.4843251372), (448.1722994824, 105.7635750767)],
                knots=[0, 0, 0, 1, 1, 1], degree=2))
            Line((448.1722994824, 105.7635750767), (448.1722994824, 37.9848740995))
        make_face(mode=Mode.SUBTRACT)
    extrude(amount=F1_DEPTH)


solid = f1.part
